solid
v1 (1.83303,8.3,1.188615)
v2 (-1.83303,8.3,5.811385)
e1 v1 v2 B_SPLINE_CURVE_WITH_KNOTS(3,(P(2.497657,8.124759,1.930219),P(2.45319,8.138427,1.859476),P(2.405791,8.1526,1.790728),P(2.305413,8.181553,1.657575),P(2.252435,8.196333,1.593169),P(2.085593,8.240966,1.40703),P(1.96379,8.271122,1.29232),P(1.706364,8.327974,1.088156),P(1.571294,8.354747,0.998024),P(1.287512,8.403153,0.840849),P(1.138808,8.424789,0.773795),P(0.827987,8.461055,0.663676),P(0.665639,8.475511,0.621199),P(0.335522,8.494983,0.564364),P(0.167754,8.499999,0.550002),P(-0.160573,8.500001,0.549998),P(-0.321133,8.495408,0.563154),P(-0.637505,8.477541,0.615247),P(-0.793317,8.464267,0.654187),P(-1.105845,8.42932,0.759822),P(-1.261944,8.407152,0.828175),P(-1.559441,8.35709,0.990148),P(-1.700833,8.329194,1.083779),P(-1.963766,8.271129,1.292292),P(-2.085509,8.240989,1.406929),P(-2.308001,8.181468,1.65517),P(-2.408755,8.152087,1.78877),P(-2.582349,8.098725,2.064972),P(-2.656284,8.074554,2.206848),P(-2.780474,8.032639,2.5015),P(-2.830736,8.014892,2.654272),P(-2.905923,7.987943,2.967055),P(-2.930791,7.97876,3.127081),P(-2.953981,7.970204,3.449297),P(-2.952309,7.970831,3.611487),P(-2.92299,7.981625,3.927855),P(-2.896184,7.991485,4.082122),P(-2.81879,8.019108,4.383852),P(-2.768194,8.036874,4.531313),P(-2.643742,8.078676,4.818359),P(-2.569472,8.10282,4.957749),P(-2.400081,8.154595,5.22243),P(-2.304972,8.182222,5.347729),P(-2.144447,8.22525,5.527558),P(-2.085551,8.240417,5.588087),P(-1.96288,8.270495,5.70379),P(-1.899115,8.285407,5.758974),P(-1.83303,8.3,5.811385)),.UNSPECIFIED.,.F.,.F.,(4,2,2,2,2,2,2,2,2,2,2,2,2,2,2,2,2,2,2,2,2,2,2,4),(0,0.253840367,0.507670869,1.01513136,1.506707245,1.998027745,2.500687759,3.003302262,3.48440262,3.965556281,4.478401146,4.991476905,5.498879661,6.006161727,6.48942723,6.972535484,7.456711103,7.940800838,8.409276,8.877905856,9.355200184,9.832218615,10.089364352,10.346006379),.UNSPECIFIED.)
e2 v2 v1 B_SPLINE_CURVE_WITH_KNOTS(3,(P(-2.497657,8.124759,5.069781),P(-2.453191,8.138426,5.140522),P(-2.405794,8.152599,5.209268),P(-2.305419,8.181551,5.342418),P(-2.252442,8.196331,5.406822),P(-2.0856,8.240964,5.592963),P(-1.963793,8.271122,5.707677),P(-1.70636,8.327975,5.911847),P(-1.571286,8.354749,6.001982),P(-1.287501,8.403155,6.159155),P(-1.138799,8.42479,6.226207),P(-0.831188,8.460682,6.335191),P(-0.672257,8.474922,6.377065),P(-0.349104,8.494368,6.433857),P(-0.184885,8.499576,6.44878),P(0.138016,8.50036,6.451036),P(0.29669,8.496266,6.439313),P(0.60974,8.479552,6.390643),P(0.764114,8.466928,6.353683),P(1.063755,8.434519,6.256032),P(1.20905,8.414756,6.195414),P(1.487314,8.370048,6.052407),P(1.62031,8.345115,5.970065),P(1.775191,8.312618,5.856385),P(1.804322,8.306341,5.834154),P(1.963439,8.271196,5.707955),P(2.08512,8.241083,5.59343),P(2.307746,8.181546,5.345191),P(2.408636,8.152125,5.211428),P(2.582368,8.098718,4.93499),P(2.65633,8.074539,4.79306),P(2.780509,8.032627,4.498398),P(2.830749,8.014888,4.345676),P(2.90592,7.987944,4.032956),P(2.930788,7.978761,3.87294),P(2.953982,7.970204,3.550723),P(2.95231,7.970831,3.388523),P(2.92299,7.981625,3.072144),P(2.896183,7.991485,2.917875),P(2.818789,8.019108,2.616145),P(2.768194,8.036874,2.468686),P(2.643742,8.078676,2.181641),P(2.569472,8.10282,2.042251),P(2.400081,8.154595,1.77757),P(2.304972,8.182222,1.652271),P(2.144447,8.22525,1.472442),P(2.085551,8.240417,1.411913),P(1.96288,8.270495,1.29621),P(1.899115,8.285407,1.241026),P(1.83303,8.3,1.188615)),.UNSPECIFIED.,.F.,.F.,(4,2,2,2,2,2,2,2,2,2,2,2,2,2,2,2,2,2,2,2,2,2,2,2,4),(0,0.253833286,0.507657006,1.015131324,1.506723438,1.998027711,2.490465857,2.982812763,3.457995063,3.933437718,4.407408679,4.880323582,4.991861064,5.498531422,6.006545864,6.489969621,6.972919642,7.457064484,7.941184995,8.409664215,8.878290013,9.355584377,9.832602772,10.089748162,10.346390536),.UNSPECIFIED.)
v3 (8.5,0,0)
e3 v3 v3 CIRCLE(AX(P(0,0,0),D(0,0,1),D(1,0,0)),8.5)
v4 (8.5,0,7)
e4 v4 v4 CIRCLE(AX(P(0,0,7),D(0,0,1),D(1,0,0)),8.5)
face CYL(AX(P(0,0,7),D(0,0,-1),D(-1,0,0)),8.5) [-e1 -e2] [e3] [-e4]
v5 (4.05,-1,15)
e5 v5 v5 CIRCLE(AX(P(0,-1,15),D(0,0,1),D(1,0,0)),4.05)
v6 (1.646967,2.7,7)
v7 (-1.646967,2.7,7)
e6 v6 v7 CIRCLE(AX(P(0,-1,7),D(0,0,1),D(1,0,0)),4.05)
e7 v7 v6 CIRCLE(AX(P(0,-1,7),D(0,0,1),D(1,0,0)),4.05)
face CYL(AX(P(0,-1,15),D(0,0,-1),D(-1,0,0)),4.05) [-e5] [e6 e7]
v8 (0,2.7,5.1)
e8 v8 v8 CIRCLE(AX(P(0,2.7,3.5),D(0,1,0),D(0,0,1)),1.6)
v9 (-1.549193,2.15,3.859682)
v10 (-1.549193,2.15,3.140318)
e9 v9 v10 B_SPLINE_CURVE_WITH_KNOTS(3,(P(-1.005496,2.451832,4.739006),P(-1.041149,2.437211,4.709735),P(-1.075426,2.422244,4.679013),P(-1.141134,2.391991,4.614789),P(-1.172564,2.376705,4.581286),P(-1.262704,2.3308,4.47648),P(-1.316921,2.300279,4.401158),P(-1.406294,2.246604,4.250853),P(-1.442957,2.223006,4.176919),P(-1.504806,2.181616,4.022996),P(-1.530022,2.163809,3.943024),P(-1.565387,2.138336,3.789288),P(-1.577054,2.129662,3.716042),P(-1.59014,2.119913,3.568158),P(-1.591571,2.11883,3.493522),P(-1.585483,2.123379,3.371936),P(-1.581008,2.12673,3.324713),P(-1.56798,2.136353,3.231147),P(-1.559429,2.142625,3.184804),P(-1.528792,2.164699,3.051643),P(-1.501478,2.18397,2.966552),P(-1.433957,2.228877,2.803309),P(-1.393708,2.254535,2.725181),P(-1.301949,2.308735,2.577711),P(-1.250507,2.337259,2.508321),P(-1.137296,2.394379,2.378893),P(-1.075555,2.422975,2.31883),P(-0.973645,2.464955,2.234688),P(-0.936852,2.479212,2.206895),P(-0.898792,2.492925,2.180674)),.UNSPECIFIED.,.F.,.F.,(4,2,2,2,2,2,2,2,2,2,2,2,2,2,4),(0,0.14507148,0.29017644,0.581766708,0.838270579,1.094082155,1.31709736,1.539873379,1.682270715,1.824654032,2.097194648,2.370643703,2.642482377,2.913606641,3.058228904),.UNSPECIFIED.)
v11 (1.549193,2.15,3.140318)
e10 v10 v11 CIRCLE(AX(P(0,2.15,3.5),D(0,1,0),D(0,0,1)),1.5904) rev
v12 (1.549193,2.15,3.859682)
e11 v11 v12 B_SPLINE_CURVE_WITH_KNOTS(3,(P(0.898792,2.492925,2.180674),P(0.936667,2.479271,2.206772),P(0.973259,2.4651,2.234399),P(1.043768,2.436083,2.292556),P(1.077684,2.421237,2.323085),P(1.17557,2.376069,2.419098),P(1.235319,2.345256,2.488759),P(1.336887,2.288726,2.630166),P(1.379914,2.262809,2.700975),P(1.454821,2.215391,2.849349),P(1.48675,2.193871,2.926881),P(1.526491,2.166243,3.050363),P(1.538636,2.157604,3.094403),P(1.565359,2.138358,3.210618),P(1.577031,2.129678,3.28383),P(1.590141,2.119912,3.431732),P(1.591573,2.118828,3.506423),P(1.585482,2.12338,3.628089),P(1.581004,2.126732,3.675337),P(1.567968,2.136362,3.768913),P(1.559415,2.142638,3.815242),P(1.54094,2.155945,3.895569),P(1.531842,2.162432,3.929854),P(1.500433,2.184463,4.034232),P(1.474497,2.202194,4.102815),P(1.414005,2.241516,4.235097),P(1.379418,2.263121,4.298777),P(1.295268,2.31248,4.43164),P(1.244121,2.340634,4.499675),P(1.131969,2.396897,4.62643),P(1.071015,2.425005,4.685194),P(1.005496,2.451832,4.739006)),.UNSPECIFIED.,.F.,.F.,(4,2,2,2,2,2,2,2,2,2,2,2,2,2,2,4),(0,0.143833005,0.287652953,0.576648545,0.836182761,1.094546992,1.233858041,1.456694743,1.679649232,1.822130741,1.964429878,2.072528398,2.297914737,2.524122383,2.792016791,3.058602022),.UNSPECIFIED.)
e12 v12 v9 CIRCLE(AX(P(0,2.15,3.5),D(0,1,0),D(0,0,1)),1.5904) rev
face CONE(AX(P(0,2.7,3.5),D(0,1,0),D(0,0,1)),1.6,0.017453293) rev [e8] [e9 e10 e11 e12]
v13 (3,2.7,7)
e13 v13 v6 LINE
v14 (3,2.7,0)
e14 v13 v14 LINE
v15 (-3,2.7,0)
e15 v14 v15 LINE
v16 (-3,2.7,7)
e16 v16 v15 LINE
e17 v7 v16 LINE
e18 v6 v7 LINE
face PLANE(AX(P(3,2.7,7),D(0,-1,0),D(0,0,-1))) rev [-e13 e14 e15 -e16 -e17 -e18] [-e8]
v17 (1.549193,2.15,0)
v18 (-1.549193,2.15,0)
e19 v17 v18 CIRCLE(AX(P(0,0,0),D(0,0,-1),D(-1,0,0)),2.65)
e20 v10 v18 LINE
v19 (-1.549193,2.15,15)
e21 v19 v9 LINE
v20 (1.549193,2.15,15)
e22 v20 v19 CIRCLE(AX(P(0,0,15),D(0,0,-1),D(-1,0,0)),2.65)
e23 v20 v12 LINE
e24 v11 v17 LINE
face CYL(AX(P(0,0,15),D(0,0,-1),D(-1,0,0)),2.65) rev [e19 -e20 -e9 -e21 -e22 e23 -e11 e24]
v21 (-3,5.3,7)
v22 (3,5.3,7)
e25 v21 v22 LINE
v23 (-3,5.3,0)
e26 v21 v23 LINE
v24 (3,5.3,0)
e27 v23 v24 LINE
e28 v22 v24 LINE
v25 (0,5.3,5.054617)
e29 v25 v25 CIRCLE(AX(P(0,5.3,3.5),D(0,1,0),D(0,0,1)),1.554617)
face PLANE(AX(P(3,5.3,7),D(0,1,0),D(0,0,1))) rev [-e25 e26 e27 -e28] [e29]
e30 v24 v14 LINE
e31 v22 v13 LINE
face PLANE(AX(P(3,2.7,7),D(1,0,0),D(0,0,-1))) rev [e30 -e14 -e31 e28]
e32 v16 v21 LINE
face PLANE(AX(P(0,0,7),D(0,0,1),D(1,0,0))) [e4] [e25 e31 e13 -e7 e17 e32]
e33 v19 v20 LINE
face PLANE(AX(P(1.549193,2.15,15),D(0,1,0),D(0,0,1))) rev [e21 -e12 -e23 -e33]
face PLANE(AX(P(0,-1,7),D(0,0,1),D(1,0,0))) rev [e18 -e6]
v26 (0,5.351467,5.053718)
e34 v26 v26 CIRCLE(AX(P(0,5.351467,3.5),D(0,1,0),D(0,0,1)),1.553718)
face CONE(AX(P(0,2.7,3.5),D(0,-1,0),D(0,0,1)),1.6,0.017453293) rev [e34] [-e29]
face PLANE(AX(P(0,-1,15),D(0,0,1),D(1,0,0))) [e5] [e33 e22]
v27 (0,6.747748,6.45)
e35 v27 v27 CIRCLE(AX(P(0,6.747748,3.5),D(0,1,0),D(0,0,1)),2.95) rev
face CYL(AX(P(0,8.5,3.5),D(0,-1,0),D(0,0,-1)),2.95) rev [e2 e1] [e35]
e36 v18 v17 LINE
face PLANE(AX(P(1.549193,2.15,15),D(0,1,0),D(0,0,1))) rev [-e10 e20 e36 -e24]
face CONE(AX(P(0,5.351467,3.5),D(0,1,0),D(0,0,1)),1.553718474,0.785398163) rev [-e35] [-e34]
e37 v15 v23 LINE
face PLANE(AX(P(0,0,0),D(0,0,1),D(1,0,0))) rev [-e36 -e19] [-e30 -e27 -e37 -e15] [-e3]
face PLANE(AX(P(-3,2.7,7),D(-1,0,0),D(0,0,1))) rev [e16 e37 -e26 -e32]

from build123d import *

# Parameters (mm, degrees)
ESQUISSE1_R             = 8.5
BOSS_EXTRU_1_DEPTH      = 7
ESQUISSE2_W             = 6
ESQUISSE2_H             = 2.6
ENL_V_MAT_EXTRU_1_DEPTH = 14.910427743
ESQUISSE7_R             = 2.95
ENL_V_MAT_EXTRU_8_DEPTH = 21.087060672
ESQUISSE9_R             = 4.05
BOSS_EXTRU_2_DEPTH      = 8
ENL_V_MAT_EXTRU_9_DEPTH = 20.222382876


with BuildPart() as part:
    # Esquisse1 → Boss.-Extru.1 (new body)
    with BuildSketch(Plane.XY):
        Circle(ESQUISSE1_R)
    extrude(amount=BOSS_EXTRU_1_DEPTH)

    # Esquisse2 → Enlèv. mat.-Extru.1 (cut, through all)
    with BuildSketch(Plane(origin=(0, 0, 0), x_dir=(-1, 0, 0), z_dir=(0, 0, -1))):
        with Locations((0, 4)):
            Rectangle(ESQUISSE2_W, ESQUISSE2_H)
    extrude(amount=-ENL_V_MAT_EXTRU_1_DEPTH, mode=Mode.SUBTRACT)

    # Enlèv. mat.-Extru.2: read off the stored shape, not the designer's step
    # Enlèv. mat.-Extru.2 outline → Enlèv. mat.-Extru.2 (revolve, cut)
    with BuildSketch(Plane.XY.offset(3.5)):
        Polygon((0, 5.3), (1.554616831, 5.3), (1.498760014, 8.500034923), (0, 8.500034923), align=None)
        Polygon((1.6, 2.7), (0, 2.7), (0, 0.7), (1.56508987, 0.7), align=None)
    revolve(axis=Axis((0, 0, 3.5), (0, 1, 0)), mode=Mode.SUBTRACT)

    # Esquisse7 → Enlèv. mat.-Extru.8 (cut, through all)
    with BuildSketch(Plane(origin=(0, 8.3, 0), x_dir=(1, 0, 0), z_dir=(0, 1, 0))):
        with Locations((0, -3.5)):
            Circle(ESQUISSE7_R)
    extrude(amount=ENL_V_MAT_EXTRU_8_DEPTH, mode=Mode.SUBTRACT)

    # Chanfrein1: read off the stored shape, not the designer's step
    # Chanfrein1 outline → Chanfrein1 (revolve, cut)
    with BuildSketch(Plane.XY.offset(3.5)):
        Polygon((2.95, 6.747748364), (2.95, 8.3), (1.502251636, 8.3), (1.553718474, 5.351466838), align=None)
    revolve(axis=Axis((0, 0, 3.5), (0, 1, 0)), mode=Mode.SUBTRACT)

    # Esquisse9 → Boss.-Extru.2 (add)
    with BuildSketch(Plane.XY.offset(7)):
        with Locations(Location((0, -1, 0), (0, 0, 113.995098868))):
            Circle(ESQUISSE9_R)
    extrude(amount=BOSS_EXTRU_2_DEPTH)

    # Esquisse10 → Enlèv. mat.-Extru.9 (cut, through all)
    with BuildSketch(Plane(origin=(0, 0, 0), x_dir=(-1, 0, 0), z_dir=(0, 0, -1))):
        with BuildLine():
            Line((-1.549193338, 2.15), (1.549193338, 2.15))
            ThreePointArc((1.549193338, 2.15), (0, -2.65), (-1.549193338, 2.15))
        make_face()
    extrude(amount=-ENL_V_MAT_EXTRU_9_DEPTH, mode=Mode.SUBTRACT)


solid = part.part
